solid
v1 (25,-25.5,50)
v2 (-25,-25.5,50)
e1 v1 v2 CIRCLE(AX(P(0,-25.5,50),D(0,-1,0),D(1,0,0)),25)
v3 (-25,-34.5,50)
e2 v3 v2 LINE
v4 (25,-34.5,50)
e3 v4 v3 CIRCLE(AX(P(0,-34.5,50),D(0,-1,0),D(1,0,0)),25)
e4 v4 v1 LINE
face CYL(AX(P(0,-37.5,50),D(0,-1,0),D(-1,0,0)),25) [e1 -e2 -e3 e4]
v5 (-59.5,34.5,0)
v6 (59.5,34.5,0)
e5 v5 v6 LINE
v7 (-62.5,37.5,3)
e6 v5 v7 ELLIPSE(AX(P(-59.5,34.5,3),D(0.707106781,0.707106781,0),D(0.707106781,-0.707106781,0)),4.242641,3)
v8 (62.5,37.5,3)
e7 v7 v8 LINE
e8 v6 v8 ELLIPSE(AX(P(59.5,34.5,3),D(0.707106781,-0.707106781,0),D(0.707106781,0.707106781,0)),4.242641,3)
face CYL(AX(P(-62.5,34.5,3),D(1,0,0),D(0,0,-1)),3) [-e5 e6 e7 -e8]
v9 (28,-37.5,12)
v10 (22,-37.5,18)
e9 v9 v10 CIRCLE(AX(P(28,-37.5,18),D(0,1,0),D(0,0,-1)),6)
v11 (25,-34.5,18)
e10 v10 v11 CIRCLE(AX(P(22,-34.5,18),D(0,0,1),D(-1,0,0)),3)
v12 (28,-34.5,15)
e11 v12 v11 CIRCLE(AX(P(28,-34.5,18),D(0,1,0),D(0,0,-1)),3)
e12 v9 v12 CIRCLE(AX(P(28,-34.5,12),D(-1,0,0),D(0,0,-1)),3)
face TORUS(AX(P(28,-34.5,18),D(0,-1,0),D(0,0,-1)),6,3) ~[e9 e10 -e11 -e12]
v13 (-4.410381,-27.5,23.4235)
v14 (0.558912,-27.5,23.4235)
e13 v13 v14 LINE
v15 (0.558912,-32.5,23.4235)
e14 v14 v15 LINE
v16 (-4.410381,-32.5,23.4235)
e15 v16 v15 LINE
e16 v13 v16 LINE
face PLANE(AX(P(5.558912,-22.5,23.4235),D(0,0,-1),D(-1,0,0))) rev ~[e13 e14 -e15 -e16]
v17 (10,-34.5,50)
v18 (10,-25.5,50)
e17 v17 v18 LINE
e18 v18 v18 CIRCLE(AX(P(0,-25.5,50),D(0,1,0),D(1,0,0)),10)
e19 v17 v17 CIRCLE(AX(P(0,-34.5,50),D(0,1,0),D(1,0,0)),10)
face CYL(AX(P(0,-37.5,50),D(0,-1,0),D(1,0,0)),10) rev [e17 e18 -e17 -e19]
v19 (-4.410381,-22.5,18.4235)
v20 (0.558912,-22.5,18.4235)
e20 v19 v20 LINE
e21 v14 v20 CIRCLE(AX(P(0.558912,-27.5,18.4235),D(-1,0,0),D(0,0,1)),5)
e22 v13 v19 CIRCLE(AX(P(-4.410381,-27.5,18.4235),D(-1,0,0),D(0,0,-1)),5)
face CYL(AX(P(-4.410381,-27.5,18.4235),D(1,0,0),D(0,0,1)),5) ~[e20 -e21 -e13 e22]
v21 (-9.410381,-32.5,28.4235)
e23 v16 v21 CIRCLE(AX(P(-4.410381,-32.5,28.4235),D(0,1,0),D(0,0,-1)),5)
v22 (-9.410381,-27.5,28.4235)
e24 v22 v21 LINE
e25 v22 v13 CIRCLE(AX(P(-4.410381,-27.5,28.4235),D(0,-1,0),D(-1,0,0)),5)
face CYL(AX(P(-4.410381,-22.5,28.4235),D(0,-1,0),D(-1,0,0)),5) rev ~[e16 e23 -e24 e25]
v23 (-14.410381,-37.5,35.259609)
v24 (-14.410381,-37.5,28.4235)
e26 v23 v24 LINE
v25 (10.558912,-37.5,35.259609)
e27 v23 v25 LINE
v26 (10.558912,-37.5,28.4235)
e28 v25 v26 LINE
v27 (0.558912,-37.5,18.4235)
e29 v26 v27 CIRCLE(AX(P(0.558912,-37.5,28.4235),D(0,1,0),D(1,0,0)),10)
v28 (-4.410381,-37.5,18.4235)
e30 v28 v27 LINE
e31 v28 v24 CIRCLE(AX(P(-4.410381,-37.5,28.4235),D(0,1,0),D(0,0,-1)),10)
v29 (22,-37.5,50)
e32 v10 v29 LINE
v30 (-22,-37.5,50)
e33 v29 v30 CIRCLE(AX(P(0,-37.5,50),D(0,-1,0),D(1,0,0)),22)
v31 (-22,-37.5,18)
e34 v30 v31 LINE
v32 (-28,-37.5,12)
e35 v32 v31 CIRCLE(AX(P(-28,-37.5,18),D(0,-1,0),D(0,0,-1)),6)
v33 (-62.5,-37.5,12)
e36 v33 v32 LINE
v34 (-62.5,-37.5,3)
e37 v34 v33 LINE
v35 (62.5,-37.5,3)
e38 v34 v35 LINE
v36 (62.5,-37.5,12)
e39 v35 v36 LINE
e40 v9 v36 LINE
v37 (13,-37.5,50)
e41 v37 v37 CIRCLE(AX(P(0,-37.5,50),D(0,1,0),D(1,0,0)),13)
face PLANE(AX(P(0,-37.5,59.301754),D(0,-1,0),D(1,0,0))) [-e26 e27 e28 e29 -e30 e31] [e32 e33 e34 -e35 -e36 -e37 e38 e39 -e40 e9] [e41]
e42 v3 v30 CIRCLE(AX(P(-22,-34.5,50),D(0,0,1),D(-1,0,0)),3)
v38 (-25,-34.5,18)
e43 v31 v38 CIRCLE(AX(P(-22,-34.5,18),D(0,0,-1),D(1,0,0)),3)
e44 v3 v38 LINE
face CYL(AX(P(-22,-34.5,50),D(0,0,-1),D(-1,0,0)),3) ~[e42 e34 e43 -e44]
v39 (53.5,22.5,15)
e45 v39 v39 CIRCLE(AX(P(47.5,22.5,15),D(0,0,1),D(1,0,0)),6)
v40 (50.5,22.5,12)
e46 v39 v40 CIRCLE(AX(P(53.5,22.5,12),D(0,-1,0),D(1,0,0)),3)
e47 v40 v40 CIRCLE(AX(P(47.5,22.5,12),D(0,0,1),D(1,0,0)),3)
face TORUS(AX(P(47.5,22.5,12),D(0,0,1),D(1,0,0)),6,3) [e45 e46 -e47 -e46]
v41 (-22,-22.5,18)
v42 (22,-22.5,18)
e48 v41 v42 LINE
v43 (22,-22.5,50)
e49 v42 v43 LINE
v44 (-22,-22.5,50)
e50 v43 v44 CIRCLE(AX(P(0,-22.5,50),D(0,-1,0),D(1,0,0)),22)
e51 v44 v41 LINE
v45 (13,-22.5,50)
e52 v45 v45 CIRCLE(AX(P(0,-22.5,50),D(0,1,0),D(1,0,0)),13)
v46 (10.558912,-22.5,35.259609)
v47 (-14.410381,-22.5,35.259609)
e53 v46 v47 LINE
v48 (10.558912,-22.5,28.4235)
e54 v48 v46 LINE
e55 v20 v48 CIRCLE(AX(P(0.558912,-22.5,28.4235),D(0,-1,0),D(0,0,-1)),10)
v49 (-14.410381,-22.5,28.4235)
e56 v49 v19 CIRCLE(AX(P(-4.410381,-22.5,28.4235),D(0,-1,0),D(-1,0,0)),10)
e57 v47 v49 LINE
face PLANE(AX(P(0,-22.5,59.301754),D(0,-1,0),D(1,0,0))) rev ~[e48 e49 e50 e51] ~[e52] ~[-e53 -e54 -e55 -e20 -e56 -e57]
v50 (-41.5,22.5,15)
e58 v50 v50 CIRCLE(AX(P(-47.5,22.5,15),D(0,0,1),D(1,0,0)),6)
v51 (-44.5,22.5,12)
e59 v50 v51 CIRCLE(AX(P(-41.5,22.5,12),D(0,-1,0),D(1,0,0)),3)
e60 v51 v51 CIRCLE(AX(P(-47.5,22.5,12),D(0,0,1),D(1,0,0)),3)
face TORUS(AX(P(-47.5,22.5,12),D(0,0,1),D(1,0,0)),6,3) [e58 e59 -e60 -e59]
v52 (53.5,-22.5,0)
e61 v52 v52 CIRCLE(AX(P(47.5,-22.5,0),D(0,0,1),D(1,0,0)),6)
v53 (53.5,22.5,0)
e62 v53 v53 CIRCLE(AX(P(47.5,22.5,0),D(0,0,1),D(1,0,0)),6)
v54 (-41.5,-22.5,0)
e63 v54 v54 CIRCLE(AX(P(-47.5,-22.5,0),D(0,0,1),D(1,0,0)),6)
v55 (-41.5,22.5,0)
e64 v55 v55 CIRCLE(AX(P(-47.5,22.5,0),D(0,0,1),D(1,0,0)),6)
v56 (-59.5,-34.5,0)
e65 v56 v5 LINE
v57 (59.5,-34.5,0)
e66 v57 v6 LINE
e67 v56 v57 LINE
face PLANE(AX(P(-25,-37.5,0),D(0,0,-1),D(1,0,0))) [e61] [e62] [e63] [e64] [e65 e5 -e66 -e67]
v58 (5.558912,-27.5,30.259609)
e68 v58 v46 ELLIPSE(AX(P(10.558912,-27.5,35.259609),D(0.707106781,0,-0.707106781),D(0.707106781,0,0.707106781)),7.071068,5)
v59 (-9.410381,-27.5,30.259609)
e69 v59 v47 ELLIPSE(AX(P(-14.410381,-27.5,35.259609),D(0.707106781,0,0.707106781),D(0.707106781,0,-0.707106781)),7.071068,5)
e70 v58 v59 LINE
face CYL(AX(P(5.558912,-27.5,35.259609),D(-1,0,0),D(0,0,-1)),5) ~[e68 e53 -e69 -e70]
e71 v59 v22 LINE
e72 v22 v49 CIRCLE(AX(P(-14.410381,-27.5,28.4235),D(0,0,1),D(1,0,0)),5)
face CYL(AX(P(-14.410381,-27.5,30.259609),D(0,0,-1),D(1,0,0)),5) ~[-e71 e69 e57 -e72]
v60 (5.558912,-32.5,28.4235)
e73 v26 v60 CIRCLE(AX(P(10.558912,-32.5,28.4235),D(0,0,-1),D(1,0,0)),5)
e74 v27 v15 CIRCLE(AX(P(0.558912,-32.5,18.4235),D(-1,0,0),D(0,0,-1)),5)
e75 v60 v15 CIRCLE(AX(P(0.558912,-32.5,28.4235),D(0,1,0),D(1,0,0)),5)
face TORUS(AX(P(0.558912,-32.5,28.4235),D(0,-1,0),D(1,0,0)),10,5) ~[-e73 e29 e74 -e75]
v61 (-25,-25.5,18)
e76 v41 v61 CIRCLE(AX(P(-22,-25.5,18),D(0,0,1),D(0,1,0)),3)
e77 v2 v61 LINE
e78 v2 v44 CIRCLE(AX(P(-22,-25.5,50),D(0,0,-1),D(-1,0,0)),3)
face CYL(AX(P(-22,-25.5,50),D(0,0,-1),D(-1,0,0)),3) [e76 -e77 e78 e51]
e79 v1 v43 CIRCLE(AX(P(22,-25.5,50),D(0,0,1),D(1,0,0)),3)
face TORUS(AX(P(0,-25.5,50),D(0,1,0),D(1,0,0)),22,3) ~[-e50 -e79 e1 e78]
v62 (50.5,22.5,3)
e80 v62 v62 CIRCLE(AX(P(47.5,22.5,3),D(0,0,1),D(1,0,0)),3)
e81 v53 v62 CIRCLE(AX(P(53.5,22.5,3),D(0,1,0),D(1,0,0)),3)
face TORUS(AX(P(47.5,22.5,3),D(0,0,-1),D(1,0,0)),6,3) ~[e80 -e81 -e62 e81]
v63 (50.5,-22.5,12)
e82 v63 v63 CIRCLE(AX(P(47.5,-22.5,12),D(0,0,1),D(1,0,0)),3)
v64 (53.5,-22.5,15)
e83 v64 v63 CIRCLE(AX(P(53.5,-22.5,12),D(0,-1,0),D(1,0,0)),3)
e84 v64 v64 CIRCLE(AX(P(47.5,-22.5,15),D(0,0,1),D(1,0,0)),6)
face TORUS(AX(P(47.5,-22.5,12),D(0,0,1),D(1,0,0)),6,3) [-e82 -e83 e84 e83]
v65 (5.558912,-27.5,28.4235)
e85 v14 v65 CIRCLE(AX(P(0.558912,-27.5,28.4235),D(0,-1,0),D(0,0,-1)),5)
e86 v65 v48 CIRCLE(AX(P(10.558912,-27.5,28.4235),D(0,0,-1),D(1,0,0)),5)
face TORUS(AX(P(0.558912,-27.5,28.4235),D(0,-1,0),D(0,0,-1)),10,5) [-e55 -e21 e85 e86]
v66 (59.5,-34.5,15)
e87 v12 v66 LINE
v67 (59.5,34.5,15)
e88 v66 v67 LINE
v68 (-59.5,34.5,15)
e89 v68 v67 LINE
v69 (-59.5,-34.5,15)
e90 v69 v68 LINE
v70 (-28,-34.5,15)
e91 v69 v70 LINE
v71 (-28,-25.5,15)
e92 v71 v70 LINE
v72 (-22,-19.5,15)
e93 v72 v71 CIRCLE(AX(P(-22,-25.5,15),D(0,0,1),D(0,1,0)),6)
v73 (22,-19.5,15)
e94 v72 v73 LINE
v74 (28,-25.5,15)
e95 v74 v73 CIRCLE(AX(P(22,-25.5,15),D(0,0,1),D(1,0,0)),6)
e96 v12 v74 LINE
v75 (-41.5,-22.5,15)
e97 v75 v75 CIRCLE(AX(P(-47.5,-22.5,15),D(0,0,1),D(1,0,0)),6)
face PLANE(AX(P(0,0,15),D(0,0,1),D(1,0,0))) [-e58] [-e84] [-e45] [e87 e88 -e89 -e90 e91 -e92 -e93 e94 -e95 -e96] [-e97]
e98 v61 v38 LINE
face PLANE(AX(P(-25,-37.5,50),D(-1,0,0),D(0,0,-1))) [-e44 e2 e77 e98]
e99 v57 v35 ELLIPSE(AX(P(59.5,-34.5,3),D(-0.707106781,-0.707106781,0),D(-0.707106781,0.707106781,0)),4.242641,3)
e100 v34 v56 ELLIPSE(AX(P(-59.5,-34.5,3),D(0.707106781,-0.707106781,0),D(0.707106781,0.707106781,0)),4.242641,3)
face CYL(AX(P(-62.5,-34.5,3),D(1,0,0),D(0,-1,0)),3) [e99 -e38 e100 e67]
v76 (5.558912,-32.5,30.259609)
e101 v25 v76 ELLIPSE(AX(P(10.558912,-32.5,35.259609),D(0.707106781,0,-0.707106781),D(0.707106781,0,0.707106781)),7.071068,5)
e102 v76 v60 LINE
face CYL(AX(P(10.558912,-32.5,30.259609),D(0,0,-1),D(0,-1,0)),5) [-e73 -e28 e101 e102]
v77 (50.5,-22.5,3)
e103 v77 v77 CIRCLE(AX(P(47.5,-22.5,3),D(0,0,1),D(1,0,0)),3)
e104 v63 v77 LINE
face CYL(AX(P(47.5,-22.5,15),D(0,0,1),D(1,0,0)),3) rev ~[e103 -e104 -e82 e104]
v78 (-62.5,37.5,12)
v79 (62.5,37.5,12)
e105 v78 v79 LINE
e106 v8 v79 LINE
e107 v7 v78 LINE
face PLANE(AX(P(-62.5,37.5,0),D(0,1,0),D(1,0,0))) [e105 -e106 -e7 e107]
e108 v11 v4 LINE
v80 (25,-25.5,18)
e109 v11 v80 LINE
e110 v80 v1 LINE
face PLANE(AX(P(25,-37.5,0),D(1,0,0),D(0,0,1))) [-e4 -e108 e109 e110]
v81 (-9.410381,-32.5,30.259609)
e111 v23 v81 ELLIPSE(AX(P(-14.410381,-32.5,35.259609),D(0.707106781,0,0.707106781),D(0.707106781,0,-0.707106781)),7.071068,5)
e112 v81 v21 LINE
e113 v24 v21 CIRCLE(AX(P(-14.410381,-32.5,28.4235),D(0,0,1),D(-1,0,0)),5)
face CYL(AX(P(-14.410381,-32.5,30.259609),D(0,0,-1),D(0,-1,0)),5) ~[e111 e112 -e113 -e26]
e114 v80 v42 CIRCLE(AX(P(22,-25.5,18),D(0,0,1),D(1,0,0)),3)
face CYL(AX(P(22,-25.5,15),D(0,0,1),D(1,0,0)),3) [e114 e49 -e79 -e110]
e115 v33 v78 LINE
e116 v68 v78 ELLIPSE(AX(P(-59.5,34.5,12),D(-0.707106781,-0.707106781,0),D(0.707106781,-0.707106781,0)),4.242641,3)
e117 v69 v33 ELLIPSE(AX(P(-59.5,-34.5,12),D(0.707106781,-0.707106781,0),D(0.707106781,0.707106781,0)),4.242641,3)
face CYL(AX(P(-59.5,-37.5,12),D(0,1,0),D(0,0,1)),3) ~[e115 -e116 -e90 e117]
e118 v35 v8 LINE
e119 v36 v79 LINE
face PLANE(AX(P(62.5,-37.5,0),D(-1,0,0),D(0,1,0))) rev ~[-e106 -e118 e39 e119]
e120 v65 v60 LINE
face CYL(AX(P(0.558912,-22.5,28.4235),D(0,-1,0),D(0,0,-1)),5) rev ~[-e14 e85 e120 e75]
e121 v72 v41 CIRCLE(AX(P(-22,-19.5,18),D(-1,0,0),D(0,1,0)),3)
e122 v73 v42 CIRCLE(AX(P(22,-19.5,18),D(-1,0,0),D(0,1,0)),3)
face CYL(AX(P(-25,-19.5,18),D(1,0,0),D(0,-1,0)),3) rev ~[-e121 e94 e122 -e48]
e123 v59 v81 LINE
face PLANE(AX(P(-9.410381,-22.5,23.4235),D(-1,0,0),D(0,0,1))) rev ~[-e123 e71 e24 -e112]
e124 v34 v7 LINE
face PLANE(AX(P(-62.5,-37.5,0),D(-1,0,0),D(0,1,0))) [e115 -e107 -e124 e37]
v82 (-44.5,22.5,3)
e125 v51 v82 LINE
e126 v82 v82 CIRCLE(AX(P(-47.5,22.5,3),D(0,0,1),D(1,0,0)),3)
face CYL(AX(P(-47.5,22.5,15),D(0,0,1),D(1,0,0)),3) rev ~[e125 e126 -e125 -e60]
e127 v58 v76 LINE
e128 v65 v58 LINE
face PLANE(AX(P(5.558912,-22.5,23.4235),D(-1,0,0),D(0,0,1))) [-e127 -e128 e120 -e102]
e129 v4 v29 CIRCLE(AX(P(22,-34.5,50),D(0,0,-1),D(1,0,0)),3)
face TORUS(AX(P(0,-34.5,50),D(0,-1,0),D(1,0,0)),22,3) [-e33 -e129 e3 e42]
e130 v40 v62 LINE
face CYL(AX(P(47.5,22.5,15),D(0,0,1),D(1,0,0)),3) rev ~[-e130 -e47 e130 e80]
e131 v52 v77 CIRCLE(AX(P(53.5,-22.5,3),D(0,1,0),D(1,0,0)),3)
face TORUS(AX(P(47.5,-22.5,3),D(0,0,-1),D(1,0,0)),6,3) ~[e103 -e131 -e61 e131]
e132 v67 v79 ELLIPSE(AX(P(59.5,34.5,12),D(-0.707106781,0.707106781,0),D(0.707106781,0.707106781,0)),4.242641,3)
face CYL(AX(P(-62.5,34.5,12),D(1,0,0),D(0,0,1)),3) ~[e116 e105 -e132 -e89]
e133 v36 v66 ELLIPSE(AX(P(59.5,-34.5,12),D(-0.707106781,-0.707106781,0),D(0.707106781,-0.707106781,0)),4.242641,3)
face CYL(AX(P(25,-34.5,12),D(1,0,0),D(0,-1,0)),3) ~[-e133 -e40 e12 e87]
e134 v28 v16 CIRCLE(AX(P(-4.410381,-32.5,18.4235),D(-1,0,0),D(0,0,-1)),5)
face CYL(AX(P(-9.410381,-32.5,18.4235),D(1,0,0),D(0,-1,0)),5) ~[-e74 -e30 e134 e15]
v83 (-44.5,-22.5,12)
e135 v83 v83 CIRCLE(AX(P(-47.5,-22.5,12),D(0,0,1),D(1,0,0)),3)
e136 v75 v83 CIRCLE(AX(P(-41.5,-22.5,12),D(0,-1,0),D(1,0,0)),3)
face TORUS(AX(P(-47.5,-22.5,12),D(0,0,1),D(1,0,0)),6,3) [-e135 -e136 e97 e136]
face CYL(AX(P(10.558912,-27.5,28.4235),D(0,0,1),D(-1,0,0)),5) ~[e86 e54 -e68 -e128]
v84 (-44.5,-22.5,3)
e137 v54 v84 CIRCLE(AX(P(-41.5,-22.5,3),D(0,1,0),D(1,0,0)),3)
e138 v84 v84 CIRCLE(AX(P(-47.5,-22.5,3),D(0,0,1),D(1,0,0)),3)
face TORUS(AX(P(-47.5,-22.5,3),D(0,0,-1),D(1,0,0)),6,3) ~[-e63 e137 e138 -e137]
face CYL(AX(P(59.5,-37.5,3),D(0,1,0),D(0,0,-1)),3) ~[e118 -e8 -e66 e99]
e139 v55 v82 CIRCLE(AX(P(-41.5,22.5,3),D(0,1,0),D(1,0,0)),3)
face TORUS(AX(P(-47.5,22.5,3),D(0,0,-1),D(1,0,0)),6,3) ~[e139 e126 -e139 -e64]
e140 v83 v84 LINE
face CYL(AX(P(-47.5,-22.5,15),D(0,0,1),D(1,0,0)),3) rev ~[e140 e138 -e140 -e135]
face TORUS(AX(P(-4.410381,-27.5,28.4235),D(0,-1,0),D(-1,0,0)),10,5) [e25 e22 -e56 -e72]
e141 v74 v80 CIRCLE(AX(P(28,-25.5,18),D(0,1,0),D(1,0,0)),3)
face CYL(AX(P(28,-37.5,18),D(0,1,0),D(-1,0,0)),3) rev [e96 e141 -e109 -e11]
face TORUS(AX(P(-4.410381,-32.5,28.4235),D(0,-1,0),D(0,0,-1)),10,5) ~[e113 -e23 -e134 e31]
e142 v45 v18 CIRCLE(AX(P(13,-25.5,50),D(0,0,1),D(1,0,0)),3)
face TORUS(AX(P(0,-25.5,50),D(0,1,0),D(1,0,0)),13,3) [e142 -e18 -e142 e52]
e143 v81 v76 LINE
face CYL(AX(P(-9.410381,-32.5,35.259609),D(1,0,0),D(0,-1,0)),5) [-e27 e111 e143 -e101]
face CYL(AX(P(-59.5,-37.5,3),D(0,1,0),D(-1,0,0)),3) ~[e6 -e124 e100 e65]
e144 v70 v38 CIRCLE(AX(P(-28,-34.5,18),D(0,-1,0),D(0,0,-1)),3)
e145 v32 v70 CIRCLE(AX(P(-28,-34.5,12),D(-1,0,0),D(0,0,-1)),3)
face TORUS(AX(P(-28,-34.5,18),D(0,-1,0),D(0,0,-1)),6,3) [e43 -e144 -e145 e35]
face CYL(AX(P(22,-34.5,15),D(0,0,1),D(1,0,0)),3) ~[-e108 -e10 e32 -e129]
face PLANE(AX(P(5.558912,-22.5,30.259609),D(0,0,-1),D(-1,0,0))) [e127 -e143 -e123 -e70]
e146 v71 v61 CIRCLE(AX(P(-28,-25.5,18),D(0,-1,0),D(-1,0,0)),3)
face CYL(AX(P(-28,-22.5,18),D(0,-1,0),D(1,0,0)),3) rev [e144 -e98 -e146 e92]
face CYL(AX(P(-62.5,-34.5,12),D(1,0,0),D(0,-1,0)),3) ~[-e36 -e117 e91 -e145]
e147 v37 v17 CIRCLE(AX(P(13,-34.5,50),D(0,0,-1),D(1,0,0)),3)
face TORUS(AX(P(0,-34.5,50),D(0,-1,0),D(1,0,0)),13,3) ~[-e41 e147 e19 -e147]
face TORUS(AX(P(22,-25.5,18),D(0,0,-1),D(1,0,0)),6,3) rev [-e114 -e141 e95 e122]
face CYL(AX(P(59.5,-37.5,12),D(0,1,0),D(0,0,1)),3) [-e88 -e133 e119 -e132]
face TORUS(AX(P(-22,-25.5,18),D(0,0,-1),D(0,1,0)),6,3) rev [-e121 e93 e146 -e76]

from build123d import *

# Parameters (mm, degrees)
F0_W     = 125
F0_H     = 75
F1_DEPTH = 15
F2_W     = 50
F2_H     = 15
F3_DEPTH = 15
F4_R     = 3
F5_DEPTH = 15
F6_R     = 3
F7_W     = 14.9692930281
F7_H     = 6.8361088634
F8_DEPTH = 25
F9_R     = 5
F10_R    = 5


with BuildPart() as f1:
    # F0 (on Top) → F1 (new body)
    with BuildSketch(Plane.XY):
        Rectangle(F0_W, F0_H)
    extrude(amount=F1_DEPTH)

    # F2 (on face) → F3 (join)
    with BuildSketch(Plane.XZ.offset(37.5)):
        with BuildLine():
            Line((10, 50), (25, 50))
            ThreePointArc((25, 50), (0, 75), (-25, 50))
            Line((-25, 50), (-10, 50))
            ThreePointArc((-10, 50), (0, 60), (10, 50))
        make_face()
        with BuildLine():
            ThreePointArc((-25, 50), (0, 25), (25, 50))
            Line((25, 50), (10, 50))
            ThreePointArc((10, 50), (0, 40), (-10, 50))
            Line((-10, 50), (-25, 50))
        make_face()
        with BuildLine():
            Line((25, 15), (25, 50))
            ThreePointArc((25, 50), (0, 25), (-25, 50))
            Line((-25, 50), (-25, 15))
            Line((-25, 15), (25, 15))
        make_face()
        with Locations((0, 7.5)):
            Rectangle(F2_W, F2_H)
    extrude(amount=-F3_DEPTH)

    # F4 (on face) → F5 (cut, through all)
    with BuildSketch(Plane.XY.offset(15)):
        with Locations((-47.5, -22.5)):
            Circle(F4_R)
        with Locations((47.5, 22.5)):
            Circle(F4_R)
        with Locations((47.5, -22.5)):
            Circle(F4_R)
        with Locations((-47.5, 22.5)):
            Circle(F4_R)
    extrude(amount=-F5_DEPTH, mode=Mode.SUBTRACT)

    # F6
    f6_edges = [f1.edges().sort_by_distance(p)[0] for p in [
        (25, -30, 15),
        (43.75, -37.5, 15),
        (62.5, 0, 15),
        (0, -22.5, 15),
        (0, 37.5, 15),
        (-25, -30, 15),
        (-62.5, 0, 15),
        (-43.75, -37.5, 15),
        (-50.5, -22.5, 15),
        (44.5, -22.5, 15),
        (-50.5, 22.5, 15),
        (44.5, 22.5, 15),
        (62.5, 0, 0),
        (0, -37.5, 0),
        (0, 37.5, 0),
        (-62.5, 0, 0),
        (-50.5, -22.5, 0),
        (44.5, -22.5, 0),
        (-50.5, 22.5, 0),
        (44.5, 22.5, 0),
        (25, -22.5, 32.5),
        (-25, -22.5, 32.5),
        (0, -22.5, 75),
        (-10, -22.5, 50),
        (-10, -37.5, 50),
        (-25, -37.5, 32.5),
        (0, -37.5, 75),
        (25, -37.5, 32.5),
    ]]
    fillet(f6_edges, radius=F6_R)

    # F7 (on face) → F8 (cut)
    with BuildSketch(Plane(origin=(0, -22.5, 0), x_dir=(-1, 0, 0), z_dir=(0, 1, 0))):
        with Locations((1.9257348031, 26.8415547907)):
            Rectangle(F7_W, F7_H)
    extrude(amount=-F8_DEPTH, mode=Mode.SUBTRACT)

    # F9
    f9_edges = [f1.edges().sort_by_distance(p)[0] for p in [
        (-1.925735, -37.5, 30.259609),
        (5.558912, -37.5, 26.841555),
        (-1.925735, -37.5, 23.4235),
        (-9.410381, -37.5, 26.841555),
        (-9.410381, -30, 23.4235),
        (5.558912, -30, 23.4235),
    ]]
    fillet(f9_edges, radius=F9_R)

    # F10
    f10_edges = [f1.edges().sort_by_distance(p)[0] for p in [
        (4.094446, -22.5, 24.887966),
        (-1.925735, -22.5, 30.259609),
        (-9.410381, -22.5, 29.341555),
        (5.558912, -22.5, 29.341555),
        (-7.945915, -22.5, 24.887966),
        (-1.925735, -22.5, 23.4235),
    ]]
    fillet(f10_edges, radius=F10_R)


solid = f1.part
